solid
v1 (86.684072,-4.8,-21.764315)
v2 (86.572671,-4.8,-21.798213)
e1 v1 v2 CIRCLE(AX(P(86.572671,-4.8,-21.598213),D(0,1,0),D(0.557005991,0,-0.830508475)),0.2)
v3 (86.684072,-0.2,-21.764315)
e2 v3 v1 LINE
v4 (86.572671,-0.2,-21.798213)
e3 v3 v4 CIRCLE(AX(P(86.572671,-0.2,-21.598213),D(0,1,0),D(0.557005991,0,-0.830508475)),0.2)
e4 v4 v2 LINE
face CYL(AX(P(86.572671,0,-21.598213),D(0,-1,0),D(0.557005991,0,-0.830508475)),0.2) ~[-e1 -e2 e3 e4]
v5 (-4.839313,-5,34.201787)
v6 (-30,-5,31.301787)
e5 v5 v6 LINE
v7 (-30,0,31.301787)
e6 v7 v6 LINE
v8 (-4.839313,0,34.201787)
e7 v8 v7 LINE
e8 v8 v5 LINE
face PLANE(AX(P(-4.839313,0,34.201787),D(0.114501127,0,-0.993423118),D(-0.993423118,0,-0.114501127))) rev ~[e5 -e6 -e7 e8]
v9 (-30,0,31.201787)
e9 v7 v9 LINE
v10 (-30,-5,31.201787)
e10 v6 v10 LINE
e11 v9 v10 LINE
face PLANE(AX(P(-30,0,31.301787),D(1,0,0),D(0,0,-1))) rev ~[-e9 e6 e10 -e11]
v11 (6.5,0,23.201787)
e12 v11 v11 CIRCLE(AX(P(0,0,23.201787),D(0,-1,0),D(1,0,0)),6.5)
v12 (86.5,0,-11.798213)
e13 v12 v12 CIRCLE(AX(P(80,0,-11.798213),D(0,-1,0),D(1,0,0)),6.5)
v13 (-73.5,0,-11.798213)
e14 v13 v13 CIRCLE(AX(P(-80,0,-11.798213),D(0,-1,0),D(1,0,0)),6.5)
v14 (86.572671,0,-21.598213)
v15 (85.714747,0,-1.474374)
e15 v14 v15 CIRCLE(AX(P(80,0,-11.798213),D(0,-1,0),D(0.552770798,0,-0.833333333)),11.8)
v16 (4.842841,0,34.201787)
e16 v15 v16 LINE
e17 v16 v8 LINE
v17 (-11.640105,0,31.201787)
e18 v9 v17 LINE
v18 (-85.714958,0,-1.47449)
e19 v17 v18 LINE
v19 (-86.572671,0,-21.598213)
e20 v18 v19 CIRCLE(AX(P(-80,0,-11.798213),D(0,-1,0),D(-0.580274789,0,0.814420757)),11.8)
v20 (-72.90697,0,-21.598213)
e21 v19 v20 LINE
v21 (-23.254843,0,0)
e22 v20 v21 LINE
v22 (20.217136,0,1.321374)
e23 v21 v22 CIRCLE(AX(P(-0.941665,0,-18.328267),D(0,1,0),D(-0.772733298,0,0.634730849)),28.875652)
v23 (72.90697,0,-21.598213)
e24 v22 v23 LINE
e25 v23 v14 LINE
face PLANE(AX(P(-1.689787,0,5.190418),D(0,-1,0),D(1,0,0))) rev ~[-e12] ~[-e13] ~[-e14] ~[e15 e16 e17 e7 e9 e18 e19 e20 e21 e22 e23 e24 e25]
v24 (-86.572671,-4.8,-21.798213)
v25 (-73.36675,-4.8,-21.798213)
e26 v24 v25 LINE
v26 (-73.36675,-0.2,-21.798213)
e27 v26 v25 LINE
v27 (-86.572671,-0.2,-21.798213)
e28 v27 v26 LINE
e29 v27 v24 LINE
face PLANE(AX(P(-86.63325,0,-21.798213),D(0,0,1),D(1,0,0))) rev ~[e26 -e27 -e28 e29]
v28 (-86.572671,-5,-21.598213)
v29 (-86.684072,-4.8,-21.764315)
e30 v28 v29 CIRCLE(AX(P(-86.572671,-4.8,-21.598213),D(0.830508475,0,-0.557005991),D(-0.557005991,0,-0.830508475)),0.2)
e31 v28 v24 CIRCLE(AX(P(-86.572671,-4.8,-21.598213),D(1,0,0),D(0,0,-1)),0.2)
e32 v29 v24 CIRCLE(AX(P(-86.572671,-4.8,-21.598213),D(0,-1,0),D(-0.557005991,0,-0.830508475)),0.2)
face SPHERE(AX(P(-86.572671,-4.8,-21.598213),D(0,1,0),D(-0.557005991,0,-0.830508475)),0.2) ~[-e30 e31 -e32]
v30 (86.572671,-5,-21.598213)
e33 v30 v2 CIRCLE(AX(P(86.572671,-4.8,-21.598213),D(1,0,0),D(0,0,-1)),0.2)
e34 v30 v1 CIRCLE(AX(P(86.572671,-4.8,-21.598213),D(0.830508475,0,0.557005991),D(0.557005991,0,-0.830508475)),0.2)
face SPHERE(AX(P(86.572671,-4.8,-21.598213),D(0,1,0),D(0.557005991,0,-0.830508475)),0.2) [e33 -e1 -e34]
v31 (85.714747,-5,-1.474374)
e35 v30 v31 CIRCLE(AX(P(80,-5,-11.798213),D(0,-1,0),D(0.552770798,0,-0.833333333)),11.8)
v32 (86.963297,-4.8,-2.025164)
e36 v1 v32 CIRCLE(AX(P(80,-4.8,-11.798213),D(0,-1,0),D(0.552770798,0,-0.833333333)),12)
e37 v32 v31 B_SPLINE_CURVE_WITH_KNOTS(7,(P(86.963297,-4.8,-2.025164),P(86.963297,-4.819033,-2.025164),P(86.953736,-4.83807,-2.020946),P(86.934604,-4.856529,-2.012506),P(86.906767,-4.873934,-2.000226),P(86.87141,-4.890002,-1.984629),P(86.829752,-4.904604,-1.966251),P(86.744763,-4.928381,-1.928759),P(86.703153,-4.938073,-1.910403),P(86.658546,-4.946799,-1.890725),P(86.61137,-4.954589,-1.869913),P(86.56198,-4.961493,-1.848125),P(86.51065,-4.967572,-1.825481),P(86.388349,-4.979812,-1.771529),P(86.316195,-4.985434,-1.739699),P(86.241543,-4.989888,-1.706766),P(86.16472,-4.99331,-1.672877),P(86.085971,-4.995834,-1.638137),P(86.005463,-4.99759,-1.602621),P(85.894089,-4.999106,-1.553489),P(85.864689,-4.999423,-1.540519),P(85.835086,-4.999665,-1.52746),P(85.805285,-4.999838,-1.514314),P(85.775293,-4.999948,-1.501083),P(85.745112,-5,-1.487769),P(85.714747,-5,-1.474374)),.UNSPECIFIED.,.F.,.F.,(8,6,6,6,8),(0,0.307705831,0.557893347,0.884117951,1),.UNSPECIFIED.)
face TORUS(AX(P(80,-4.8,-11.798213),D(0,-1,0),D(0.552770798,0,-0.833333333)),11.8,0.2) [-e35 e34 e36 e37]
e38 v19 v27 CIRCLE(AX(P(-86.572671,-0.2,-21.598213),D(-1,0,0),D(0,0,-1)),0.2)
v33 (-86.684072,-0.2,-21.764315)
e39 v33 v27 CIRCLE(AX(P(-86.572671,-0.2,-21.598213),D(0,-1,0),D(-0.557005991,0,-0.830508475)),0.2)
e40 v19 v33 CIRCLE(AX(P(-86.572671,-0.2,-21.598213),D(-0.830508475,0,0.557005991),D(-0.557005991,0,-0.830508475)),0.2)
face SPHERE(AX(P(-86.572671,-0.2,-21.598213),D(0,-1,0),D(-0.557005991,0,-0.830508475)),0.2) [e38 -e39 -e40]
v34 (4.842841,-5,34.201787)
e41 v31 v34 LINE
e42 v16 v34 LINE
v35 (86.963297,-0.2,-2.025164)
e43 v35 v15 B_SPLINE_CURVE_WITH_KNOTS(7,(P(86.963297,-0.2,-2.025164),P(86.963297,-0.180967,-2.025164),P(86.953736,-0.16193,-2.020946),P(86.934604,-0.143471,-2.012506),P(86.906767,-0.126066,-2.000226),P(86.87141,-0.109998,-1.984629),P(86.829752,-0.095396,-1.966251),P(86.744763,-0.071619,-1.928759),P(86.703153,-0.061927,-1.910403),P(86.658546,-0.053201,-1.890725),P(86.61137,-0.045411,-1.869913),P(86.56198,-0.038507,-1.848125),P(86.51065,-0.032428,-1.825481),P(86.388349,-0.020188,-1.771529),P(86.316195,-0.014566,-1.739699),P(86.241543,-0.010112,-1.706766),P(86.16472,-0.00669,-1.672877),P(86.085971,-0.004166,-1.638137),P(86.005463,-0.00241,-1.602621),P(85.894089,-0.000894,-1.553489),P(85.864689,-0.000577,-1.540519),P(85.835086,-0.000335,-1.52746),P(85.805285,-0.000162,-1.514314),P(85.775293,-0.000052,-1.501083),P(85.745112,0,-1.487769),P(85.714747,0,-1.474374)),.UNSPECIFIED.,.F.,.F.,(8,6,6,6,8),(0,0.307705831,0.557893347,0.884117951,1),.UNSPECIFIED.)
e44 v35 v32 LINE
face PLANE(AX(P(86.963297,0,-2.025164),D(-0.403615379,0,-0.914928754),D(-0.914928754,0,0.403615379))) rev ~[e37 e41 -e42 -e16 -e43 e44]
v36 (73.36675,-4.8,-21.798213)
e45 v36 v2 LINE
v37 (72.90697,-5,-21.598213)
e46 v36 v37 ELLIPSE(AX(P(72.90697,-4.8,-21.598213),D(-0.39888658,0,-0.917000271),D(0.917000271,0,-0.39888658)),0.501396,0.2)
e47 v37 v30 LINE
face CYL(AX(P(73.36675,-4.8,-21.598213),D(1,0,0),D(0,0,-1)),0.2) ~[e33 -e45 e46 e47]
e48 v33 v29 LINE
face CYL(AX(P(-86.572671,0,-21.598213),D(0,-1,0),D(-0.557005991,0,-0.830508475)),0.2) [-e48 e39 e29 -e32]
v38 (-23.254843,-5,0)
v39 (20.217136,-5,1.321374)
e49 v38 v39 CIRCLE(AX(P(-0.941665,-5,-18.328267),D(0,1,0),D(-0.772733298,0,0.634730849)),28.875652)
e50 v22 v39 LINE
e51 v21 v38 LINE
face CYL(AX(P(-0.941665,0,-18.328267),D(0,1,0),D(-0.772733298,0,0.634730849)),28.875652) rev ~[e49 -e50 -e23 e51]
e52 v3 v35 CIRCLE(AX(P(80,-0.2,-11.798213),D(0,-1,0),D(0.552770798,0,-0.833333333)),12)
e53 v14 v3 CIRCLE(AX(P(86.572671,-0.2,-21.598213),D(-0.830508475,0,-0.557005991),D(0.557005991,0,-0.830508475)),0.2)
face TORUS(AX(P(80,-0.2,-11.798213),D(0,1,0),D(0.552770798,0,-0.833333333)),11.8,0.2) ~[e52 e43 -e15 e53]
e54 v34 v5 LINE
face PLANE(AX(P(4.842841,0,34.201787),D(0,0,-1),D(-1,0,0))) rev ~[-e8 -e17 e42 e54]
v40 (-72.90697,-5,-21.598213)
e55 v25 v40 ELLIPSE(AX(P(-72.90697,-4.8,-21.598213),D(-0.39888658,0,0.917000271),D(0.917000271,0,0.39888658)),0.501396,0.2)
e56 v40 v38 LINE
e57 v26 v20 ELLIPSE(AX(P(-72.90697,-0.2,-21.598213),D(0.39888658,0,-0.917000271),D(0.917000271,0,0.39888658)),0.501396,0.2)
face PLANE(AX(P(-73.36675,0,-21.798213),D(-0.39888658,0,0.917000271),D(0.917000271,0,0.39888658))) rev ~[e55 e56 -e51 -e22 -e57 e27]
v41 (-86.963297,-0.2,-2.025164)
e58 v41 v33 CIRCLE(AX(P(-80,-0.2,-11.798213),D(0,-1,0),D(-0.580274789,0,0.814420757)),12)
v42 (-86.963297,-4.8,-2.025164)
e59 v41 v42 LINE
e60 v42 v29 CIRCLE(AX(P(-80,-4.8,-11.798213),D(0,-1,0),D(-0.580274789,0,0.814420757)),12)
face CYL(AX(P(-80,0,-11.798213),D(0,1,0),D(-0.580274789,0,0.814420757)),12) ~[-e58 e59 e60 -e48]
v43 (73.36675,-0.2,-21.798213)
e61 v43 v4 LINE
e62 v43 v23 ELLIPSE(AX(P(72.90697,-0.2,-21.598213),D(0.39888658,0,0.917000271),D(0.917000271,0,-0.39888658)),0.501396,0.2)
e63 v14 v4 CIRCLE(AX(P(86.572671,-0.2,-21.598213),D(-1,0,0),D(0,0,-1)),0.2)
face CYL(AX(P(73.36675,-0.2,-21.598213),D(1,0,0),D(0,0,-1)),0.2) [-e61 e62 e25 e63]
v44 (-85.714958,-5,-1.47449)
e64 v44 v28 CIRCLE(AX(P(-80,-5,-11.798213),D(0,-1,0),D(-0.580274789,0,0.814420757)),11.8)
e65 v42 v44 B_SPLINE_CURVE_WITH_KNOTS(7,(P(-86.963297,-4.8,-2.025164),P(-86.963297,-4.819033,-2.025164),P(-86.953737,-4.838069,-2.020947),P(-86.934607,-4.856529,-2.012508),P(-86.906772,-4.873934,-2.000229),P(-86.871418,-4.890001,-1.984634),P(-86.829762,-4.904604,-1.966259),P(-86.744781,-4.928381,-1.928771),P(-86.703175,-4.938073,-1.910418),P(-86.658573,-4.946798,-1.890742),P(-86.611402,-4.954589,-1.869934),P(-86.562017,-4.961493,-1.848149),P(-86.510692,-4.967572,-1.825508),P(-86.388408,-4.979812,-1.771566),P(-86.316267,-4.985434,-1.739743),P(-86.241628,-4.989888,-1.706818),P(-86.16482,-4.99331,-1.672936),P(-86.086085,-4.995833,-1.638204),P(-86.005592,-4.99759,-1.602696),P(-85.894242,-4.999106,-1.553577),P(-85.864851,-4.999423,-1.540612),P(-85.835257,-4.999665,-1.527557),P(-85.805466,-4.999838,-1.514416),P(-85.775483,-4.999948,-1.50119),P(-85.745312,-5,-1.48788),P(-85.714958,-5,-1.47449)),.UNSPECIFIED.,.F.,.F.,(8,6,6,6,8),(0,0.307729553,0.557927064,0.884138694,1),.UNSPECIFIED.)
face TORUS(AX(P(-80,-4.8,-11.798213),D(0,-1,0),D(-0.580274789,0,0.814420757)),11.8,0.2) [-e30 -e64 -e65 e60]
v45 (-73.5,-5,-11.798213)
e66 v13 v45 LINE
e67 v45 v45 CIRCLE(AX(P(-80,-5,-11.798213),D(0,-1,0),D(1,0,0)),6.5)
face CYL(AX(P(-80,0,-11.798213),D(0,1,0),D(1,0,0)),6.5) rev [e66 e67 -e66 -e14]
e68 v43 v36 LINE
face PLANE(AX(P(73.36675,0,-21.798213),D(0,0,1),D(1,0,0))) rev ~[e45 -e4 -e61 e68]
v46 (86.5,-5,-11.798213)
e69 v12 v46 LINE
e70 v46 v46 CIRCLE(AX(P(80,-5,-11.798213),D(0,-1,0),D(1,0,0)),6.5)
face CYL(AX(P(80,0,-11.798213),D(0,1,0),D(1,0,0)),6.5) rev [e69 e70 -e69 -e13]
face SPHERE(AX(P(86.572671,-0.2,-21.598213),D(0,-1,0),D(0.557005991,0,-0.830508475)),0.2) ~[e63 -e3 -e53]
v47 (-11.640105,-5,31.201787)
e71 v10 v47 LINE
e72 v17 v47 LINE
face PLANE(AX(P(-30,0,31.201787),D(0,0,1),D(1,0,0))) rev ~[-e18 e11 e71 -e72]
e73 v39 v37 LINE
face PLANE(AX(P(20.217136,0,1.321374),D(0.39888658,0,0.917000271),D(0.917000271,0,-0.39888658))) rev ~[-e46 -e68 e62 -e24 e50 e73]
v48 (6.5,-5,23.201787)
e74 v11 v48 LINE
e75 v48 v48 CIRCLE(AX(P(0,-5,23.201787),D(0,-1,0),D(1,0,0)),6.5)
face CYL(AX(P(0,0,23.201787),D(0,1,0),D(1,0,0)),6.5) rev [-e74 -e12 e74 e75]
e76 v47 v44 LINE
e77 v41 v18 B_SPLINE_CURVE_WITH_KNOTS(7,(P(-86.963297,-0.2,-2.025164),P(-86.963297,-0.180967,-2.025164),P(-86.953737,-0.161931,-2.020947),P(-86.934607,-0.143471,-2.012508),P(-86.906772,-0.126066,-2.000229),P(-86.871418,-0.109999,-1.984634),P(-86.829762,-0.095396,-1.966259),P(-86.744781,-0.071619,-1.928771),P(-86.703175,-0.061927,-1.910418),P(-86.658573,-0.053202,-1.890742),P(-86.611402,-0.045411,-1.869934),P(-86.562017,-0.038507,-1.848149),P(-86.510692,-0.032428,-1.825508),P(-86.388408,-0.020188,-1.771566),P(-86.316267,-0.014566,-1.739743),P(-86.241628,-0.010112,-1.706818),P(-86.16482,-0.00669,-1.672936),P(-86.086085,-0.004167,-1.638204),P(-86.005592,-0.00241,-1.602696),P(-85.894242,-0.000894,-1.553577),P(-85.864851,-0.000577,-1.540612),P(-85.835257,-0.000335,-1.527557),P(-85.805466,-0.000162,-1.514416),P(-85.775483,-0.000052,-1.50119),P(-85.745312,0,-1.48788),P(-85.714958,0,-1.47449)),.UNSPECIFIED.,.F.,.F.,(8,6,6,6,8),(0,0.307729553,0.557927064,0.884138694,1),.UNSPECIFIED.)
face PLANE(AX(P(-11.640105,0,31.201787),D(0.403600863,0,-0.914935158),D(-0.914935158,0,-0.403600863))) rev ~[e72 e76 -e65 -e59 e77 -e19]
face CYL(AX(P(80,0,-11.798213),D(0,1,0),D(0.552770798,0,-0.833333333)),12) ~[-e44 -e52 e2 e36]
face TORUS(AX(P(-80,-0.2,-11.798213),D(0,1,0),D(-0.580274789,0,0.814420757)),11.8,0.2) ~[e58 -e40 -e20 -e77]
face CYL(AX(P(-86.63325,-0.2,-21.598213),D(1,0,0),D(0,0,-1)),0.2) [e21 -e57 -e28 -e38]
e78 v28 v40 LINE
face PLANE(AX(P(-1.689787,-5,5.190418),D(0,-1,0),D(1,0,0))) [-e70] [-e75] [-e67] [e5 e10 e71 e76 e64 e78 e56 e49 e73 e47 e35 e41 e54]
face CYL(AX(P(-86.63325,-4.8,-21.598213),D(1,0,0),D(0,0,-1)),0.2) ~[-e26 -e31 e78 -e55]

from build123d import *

# Parameters (mm, degrees)
F0_R     = 6.5
F1_DEPTH = 5
F3_R     = 0.2


# Not quite as in the source:
# - a feature of the source that left no trace in its solid (it failed there, or was rolled back) is left out


with BuildPart() as f1:
    # F0 (on Front) → F1 (new body)
    with BuildSketch(Plane.XZ):
        with BuildLine():
            Line((-11.6401047196, 31.2017867216), (-86.9632974703, -2.0251641974))
            ThreePointArc((-86.9632974703, -2.0251641974), (-91.998328651, -11.9984870467), (-86.6332495807, -21.7982132784))
            Line((-86.6332495807, -21.7982132784), (-73.3667504193, -21.7982132784))
            Line((-73.3667504193, -21.7982132784), (-23.2548427581, 0))
            ThreePointArc((-23.2548427581, 0), (-1.8189642808, 10.5340546664), (20.2171359245, 1.3213741908))
            Line((20.2171359245, 1.3213741908), (73.3667504193, -21.7982132784))
            Line((73.3667504193, -21.7982132784), (86.6332495807, -21.7982132784))
            ThreePointArc((86.6332495807, -21.7982132784), (91.998328651, -11.9984870467), (86.9632974703, -2.0251641974))
            Line((86.9632974703, -2.0251641974), (4.8428413091, 34.2017867216))
            Line((4.8428413091, 34.2017867216), (-4.8393128322, 34.2017867216))
            Line((-4.8393128322, 34.2017867216), (-30, 31.3017867216))
            Line((-30, 31.3017867216), (-30, 31.2017867216))
            Line((-30, 31.2017867216), (-11.6401047196, 31.2017867216))
        make_face()
        with Locations((-80, -11.7982132784)):
            Circle(F0_R, mode=Mode.SUBTRACT)
        with Locations((80, -11.7982132784)):
            Circle(F0_R, mode=Mode.SUBTRACT)
        with Locations((0, 23.2017867216)):
            Circle(F0_R, mode=Mode.SUBTRACT)
    extrude(amount=F1_DEPTH)

    # F3
    f3_edges = [f1.edges().sort_by_distance(p)[0] for p in [
        (80, -5, -21.798213),
        (80, 0, -21.798213),
        (-80, -5, -21.798213),
        (-80, 0, -21.798213),
        (-86.63325, -2.5, -21.798213),
        (-91.998329, 0, -11.998487),
        (-91.998329, -5, -11.998487),
        (86.63325, -2.5, -21.798213),
        (91.998329, 0, -11.998487),
        (91.998329, -5, -11.998487),
    ]]
    fillet(f3_edges, radius=F3_R)


solid = f1.part
